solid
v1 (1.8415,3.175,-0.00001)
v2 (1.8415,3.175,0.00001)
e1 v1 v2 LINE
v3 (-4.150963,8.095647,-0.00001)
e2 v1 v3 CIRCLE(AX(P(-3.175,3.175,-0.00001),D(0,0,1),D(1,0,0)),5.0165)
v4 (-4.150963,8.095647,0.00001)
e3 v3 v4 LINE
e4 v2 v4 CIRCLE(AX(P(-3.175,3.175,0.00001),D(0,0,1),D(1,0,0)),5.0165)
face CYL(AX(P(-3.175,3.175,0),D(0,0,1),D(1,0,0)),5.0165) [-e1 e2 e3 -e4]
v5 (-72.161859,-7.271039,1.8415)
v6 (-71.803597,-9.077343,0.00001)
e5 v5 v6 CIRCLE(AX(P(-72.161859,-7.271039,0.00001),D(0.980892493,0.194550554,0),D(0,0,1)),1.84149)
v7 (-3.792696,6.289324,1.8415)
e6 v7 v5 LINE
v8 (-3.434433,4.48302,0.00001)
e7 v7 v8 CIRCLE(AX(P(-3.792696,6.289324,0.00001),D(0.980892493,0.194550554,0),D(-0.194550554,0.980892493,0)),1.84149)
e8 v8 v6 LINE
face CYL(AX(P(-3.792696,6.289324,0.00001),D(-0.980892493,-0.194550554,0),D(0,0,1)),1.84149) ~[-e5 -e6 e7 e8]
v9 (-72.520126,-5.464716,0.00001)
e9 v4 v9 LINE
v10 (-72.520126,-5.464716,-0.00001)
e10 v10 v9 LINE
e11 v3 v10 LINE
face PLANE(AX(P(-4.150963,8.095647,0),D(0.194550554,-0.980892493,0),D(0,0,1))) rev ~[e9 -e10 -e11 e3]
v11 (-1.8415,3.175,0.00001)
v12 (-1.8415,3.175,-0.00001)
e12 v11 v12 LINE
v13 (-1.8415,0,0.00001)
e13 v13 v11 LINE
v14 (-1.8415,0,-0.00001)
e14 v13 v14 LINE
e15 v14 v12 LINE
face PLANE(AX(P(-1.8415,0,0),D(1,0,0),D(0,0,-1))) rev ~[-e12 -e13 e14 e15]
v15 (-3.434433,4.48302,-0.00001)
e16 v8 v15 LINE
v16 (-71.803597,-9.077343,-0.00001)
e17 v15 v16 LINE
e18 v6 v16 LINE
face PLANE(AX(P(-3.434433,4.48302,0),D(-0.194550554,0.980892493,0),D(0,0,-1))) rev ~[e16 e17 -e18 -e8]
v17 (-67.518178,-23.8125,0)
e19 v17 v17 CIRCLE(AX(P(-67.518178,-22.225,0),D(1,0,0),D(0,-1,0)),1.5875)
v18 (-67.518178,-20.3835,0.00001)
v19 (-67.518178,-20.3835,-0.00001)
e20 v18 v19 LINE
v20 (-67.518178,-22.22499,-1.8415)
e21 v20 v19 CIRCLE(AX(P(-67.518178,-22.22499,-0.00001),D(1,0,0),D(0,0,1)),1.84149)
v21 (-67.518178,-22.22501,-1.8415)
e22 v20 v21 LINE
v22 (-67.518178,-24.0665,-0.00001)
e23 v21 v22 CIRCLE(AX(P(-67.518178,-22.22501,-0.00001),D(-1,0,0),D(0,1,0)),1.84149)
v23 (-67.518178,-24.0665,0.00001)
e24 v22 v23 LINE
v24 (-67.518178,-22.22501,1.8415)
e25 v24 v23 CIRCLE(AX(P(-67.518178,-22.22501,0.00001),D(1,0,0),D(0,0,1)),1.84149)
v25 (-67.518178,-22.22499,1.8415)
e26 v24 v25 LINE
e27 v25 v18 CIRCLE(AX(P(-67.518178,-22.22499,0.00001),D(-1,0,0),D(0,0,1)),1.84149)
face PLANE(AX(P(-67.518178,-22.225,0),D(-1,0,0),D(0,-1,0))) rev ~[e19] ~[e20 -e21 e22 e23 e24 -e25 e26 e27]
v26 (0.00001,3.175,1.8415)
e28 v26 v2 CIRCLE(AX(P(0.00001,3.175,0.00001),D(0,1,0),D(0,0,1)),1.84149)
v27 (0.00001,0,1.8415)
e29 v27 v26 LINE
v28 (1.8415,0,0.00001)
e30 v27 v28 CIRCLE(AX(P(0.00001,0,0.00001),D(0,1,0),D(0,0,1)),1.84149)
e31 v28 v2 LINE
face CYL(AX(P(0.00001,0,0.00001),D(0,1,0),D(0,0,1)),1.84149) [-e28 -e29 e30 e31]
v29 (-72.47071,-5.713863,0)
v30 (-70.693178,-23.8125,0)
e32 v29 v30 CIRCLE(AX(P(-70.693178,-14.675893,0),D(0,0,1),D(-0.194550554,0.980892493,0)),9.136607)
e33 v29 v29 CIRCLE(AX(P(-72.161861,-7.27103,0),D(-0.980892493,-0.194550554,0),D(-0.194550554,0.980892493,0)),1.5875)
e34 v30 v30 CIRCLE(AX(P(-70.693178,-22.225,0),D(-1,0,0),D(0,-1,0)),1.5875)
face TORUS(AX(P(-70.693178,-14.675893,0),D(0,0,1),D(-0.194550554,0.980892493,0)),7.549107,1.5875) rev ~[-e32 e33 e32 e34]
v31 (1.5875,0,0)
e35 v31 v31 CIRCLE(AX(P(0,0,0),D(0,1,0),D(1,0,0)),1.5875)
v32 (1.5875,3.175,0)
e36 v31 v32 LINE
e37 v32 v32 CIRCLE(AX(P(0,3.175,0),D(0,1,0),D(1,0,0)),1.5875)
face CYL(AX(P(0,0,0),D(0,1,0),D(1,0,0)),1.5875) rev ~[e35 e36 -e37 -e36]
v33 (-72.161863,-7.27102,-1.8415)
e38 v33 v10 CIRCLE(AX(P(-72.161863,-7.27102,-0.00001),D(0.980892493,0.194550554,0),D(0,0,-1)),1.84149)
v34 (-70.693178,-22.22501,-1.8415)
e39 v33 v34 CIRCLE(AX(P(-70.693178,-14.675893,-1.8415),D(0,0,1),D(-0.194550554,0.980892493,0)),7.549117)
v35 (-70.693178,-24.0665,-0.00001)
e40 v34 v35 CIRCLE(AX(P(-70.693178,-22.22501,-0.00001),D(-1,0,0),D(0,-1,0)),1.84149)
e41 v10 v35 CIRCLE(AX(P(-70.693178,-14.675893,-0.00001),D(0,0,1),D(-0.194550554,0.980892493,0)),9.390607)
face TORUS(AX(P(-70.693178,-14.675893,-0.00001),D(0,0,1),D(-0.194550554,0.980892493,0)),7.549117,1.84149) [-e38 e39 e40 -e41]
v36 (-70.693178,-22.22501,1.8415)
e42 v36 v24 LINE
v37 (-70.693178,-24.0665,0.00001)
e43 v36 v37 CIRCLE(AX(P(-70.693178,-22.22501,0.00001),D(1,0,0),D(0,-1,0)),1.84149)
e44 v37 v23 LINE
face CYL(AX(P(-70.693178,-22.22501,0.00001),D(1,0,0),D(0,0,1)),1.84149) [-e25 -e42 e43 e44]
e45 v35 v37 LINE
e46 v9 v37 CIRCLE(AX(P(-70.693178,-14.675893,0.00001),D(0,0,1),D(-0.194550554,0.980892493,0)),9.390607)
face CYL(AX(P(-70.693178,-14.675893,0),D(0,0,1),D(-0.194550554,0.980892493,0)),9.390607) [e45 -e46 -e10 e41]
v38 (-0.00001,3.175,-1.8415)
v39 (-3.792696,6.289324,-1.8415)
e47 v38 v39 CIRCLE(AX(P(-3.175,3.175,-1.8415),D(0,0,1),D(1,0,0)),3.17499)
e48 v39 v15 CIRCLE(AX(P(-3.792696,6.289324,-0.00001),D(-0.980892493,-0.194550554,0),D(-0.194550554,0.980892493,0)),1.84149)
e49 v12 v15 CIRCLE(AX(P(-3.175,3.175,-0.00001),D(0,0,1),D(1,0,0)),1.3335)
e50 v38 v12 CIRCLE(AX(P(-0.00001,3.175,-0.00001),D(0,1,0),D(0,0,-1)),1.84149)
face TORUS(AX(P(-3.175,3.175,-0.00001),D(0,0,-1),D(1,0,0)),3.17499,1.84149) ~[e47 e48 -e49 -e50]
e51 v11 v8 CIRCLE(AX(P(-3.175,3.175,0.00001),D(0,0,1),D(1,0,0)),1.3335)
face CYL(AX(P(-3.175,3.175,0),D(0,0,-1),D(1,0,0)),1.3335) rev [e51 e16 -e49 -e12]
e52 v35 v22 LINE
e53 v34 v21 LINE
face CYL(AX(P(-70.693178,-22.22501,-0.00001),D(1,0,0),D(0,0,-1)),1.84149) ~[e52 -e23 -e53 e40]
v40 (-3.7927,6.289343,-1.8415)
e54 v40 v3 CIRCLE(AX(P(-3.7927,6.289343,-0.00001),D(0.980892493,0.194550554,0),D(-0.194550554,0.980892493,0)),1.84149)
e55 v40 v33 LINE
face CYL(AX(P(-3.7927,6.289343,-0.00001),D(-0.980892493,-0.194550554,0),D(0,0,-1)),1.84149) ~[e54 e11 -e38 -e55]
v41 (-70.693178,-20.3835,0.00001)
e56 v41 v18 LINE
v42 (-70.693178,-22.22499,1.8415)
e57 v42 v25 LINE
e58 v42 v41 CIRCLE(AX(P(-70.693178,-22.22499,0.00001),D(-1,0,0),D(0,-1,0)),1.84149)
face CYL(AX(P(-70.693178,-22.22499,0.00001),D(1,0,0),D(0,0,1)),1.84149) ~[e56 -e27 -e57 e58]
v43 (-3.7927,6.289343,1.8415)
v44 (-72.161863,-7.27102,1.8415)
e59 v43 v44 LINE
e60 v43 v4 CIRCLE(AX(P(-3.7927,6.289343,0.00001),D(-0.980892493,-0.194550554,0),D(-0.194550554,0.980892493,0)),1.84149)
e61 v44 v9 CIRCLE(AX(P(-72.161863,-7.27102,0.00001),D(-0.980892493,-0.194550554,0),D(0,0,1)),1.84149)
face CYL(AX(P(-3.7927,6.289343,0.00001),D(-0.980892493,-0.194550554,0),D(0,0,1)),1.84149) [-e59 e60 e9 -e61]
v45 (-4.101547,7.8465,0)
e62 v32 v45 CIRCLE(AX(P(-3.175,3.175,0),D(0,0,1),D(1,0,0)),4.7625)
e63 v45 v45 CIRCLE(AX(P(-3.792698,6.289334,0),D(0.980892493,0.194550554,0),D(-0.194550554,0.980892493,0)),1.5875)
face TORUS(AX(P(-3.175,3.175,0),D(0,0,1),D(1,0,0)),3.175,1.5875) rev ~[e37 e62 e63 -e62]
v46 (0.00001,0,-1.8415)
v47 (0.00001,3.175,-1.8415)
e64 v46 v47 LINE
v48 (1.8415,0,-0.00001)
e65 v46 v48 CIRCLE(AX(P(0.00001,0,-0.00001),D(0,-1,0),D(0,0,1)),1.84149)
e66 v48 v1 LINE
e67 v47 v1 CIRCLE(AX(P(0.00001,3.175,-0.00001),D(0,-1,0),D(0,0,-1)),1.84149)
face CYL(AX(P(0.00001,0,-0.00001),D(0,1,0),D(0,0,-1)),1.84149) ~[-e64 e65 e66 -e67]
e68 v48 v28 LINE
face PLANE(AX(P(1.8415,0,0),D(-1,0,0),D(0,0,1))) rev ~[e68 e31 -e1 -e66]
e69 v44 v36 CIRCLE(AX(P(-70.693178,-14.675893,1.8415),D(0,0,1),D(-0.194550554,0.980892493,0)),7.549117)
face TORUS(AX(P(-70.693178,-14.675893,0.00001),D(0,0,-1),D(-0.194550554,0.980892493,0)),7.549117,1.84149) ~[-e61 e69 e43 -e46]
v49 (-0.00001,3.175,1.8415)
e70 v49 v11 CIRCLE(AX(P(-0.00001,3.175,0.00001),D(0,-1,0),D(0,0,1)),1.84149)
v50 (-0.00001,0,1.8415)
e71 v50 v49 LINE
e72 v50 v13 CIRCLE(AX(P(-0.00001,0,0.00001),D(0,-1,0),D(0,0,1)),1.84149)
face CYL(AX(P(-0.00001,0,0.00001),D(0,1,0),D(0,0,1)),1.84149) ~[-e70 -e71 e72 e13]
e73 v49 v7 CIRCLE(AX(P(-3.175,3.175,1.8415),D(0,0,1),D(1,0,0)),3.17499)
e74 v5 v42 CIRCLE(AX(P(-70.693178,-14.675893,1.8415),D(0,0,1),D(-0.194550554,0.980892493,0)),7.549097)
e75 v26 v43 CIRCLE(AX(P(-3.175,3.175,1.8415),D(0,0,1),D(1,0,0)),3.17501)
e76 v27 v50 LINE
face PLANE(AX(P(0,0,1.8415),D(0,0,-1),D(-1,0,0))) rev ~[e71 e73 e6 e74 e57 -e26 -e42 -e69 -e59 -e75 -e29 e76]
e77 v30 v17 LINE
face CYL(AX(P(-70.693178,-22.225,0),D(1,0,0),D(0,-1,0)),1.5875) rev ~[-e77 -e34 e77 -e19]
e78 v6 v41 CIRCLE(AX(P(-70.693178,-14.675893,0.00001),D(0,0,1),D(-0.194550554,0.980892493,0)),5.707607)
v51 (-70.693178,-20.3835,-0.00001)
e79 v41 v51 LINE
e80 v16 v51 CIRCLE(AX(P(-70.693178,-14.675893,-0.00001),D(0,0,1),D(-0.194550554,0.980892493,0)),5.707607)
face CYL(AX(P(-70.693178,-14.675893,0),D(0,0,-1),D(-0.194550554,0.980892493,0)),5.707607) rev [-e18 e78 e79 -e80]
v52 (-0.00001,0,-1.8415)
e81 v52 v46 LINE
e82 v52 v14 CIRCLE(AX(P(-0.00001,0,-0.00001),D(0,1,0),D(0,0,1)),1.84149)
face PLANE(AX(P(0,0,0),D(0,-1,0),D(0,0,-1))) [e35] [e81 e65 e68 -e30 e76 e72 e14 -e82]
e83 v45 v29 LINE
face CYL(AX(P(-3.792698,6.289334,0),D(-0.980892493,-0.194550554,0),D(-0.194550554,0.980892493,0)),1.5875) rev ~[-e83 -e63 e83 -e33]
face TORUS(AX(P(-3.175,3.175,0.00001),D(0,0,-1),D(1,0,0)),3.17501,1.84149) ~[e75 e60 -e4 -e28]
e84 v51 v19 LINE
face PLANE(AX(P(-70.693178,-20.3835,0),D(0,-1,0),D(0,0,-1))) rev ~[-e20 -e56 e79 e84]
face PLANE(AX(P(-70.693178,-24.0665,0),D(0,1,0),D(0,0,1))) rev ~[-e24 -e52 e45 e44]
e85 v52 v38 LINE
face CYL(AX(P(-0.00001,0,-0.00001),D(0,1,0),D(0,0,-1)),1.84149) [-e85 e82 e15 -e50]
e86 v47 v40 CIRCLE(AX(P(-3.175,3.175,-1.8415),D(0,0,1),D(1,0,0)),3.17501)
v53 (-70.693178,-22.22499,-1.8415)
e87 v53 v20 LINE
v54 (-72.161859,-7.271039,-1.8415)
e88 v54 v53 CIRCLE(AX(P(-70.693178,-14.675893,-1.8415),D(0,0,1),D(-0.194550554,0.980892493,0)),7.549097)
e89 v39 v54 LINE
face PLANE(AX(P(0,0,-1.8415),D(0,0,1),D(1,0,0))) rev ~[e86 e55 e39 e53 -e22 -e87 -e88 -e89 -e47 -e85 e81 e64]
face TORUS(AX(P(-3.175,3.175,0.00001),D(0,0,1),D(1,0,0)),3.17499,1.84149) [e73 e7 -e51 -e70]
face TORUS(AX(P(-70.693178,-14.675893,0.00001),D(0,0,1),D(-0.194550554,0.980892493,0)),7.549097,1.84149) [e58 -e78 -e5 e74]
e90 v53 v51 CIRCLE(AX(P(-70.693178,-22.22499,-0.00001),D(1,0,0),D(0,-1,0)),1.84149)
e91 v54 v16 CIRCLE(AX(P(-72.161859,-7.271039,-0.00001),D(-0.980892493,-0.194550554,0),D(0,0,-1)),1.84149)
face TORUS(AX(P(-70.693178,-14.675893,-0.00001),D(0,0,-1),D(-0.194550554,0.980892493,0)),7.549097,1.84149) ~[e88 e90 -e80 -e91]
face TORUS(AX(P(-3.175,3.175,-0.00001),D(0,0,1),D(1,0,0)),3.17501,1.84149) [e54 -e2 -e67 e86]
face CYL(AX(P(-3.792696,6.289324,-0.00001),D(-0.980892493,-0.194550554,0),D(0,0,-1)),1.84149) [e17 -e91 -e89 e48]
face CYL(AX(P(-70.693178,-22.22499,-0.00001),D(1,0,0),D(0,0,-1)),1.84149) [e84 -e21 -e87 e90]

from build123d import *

# Parameters (mm, degrees)
F1_W = 3.683
F1_H = 3.683
F1_R = 1.5875
F3_R = 1.84149


# Not quite as in the source:
# - a fillet or chamfer is up to 0.001 mm smaller than in the source, because OpenCascade refuses the exact size


with BuildPart() as f2:
    # F2: sweep along a path in F0
    with BuildLine(Plane.XY) as f2_path:
        Line((0, 0), (0, 3.175))
        ThreePointArc((0, 3.175), (-1.1601260804, 5.6287538769), (-3.7926980084, 6.289333664))
        Line((-3.7926980084, 6.289333664), (-72.1618614389, -7.2710296886))
        ThreePointArc((-72.1618614389, -7.2710296886), (-78.2061381687, -15.413767246), (-70.6931784, -22.225))
        Line((-70.6931784, -22.225), (-67.5181784, -22.225))
    # F1 (on Front) → F2 (sweep)
    with BuildSketch(Plane.XZ):
        Rectangle(F1_W, F1_H)
        Circle(F1_R, mode=Mode.SUBTRACT)
    sweep(path=f2_path.line)

    # F3 (radius 1.8415 in the source; OpenCascade refuses exactly that, so slightly less here)
    f3_edges = [f2.edges().sort_by_distance(p)[0] for p in [
        (-37.619015, -2.297162, 1.8415),
        (-37.619015, -2.297162, -1.8415),
        (-38.335545, 1.315466, 1.8415),
        (-38.335545, 1.315466, -1.8415),
    ]]
    fillet(f3_edges, radius=F3_R)


solid = f2.part
